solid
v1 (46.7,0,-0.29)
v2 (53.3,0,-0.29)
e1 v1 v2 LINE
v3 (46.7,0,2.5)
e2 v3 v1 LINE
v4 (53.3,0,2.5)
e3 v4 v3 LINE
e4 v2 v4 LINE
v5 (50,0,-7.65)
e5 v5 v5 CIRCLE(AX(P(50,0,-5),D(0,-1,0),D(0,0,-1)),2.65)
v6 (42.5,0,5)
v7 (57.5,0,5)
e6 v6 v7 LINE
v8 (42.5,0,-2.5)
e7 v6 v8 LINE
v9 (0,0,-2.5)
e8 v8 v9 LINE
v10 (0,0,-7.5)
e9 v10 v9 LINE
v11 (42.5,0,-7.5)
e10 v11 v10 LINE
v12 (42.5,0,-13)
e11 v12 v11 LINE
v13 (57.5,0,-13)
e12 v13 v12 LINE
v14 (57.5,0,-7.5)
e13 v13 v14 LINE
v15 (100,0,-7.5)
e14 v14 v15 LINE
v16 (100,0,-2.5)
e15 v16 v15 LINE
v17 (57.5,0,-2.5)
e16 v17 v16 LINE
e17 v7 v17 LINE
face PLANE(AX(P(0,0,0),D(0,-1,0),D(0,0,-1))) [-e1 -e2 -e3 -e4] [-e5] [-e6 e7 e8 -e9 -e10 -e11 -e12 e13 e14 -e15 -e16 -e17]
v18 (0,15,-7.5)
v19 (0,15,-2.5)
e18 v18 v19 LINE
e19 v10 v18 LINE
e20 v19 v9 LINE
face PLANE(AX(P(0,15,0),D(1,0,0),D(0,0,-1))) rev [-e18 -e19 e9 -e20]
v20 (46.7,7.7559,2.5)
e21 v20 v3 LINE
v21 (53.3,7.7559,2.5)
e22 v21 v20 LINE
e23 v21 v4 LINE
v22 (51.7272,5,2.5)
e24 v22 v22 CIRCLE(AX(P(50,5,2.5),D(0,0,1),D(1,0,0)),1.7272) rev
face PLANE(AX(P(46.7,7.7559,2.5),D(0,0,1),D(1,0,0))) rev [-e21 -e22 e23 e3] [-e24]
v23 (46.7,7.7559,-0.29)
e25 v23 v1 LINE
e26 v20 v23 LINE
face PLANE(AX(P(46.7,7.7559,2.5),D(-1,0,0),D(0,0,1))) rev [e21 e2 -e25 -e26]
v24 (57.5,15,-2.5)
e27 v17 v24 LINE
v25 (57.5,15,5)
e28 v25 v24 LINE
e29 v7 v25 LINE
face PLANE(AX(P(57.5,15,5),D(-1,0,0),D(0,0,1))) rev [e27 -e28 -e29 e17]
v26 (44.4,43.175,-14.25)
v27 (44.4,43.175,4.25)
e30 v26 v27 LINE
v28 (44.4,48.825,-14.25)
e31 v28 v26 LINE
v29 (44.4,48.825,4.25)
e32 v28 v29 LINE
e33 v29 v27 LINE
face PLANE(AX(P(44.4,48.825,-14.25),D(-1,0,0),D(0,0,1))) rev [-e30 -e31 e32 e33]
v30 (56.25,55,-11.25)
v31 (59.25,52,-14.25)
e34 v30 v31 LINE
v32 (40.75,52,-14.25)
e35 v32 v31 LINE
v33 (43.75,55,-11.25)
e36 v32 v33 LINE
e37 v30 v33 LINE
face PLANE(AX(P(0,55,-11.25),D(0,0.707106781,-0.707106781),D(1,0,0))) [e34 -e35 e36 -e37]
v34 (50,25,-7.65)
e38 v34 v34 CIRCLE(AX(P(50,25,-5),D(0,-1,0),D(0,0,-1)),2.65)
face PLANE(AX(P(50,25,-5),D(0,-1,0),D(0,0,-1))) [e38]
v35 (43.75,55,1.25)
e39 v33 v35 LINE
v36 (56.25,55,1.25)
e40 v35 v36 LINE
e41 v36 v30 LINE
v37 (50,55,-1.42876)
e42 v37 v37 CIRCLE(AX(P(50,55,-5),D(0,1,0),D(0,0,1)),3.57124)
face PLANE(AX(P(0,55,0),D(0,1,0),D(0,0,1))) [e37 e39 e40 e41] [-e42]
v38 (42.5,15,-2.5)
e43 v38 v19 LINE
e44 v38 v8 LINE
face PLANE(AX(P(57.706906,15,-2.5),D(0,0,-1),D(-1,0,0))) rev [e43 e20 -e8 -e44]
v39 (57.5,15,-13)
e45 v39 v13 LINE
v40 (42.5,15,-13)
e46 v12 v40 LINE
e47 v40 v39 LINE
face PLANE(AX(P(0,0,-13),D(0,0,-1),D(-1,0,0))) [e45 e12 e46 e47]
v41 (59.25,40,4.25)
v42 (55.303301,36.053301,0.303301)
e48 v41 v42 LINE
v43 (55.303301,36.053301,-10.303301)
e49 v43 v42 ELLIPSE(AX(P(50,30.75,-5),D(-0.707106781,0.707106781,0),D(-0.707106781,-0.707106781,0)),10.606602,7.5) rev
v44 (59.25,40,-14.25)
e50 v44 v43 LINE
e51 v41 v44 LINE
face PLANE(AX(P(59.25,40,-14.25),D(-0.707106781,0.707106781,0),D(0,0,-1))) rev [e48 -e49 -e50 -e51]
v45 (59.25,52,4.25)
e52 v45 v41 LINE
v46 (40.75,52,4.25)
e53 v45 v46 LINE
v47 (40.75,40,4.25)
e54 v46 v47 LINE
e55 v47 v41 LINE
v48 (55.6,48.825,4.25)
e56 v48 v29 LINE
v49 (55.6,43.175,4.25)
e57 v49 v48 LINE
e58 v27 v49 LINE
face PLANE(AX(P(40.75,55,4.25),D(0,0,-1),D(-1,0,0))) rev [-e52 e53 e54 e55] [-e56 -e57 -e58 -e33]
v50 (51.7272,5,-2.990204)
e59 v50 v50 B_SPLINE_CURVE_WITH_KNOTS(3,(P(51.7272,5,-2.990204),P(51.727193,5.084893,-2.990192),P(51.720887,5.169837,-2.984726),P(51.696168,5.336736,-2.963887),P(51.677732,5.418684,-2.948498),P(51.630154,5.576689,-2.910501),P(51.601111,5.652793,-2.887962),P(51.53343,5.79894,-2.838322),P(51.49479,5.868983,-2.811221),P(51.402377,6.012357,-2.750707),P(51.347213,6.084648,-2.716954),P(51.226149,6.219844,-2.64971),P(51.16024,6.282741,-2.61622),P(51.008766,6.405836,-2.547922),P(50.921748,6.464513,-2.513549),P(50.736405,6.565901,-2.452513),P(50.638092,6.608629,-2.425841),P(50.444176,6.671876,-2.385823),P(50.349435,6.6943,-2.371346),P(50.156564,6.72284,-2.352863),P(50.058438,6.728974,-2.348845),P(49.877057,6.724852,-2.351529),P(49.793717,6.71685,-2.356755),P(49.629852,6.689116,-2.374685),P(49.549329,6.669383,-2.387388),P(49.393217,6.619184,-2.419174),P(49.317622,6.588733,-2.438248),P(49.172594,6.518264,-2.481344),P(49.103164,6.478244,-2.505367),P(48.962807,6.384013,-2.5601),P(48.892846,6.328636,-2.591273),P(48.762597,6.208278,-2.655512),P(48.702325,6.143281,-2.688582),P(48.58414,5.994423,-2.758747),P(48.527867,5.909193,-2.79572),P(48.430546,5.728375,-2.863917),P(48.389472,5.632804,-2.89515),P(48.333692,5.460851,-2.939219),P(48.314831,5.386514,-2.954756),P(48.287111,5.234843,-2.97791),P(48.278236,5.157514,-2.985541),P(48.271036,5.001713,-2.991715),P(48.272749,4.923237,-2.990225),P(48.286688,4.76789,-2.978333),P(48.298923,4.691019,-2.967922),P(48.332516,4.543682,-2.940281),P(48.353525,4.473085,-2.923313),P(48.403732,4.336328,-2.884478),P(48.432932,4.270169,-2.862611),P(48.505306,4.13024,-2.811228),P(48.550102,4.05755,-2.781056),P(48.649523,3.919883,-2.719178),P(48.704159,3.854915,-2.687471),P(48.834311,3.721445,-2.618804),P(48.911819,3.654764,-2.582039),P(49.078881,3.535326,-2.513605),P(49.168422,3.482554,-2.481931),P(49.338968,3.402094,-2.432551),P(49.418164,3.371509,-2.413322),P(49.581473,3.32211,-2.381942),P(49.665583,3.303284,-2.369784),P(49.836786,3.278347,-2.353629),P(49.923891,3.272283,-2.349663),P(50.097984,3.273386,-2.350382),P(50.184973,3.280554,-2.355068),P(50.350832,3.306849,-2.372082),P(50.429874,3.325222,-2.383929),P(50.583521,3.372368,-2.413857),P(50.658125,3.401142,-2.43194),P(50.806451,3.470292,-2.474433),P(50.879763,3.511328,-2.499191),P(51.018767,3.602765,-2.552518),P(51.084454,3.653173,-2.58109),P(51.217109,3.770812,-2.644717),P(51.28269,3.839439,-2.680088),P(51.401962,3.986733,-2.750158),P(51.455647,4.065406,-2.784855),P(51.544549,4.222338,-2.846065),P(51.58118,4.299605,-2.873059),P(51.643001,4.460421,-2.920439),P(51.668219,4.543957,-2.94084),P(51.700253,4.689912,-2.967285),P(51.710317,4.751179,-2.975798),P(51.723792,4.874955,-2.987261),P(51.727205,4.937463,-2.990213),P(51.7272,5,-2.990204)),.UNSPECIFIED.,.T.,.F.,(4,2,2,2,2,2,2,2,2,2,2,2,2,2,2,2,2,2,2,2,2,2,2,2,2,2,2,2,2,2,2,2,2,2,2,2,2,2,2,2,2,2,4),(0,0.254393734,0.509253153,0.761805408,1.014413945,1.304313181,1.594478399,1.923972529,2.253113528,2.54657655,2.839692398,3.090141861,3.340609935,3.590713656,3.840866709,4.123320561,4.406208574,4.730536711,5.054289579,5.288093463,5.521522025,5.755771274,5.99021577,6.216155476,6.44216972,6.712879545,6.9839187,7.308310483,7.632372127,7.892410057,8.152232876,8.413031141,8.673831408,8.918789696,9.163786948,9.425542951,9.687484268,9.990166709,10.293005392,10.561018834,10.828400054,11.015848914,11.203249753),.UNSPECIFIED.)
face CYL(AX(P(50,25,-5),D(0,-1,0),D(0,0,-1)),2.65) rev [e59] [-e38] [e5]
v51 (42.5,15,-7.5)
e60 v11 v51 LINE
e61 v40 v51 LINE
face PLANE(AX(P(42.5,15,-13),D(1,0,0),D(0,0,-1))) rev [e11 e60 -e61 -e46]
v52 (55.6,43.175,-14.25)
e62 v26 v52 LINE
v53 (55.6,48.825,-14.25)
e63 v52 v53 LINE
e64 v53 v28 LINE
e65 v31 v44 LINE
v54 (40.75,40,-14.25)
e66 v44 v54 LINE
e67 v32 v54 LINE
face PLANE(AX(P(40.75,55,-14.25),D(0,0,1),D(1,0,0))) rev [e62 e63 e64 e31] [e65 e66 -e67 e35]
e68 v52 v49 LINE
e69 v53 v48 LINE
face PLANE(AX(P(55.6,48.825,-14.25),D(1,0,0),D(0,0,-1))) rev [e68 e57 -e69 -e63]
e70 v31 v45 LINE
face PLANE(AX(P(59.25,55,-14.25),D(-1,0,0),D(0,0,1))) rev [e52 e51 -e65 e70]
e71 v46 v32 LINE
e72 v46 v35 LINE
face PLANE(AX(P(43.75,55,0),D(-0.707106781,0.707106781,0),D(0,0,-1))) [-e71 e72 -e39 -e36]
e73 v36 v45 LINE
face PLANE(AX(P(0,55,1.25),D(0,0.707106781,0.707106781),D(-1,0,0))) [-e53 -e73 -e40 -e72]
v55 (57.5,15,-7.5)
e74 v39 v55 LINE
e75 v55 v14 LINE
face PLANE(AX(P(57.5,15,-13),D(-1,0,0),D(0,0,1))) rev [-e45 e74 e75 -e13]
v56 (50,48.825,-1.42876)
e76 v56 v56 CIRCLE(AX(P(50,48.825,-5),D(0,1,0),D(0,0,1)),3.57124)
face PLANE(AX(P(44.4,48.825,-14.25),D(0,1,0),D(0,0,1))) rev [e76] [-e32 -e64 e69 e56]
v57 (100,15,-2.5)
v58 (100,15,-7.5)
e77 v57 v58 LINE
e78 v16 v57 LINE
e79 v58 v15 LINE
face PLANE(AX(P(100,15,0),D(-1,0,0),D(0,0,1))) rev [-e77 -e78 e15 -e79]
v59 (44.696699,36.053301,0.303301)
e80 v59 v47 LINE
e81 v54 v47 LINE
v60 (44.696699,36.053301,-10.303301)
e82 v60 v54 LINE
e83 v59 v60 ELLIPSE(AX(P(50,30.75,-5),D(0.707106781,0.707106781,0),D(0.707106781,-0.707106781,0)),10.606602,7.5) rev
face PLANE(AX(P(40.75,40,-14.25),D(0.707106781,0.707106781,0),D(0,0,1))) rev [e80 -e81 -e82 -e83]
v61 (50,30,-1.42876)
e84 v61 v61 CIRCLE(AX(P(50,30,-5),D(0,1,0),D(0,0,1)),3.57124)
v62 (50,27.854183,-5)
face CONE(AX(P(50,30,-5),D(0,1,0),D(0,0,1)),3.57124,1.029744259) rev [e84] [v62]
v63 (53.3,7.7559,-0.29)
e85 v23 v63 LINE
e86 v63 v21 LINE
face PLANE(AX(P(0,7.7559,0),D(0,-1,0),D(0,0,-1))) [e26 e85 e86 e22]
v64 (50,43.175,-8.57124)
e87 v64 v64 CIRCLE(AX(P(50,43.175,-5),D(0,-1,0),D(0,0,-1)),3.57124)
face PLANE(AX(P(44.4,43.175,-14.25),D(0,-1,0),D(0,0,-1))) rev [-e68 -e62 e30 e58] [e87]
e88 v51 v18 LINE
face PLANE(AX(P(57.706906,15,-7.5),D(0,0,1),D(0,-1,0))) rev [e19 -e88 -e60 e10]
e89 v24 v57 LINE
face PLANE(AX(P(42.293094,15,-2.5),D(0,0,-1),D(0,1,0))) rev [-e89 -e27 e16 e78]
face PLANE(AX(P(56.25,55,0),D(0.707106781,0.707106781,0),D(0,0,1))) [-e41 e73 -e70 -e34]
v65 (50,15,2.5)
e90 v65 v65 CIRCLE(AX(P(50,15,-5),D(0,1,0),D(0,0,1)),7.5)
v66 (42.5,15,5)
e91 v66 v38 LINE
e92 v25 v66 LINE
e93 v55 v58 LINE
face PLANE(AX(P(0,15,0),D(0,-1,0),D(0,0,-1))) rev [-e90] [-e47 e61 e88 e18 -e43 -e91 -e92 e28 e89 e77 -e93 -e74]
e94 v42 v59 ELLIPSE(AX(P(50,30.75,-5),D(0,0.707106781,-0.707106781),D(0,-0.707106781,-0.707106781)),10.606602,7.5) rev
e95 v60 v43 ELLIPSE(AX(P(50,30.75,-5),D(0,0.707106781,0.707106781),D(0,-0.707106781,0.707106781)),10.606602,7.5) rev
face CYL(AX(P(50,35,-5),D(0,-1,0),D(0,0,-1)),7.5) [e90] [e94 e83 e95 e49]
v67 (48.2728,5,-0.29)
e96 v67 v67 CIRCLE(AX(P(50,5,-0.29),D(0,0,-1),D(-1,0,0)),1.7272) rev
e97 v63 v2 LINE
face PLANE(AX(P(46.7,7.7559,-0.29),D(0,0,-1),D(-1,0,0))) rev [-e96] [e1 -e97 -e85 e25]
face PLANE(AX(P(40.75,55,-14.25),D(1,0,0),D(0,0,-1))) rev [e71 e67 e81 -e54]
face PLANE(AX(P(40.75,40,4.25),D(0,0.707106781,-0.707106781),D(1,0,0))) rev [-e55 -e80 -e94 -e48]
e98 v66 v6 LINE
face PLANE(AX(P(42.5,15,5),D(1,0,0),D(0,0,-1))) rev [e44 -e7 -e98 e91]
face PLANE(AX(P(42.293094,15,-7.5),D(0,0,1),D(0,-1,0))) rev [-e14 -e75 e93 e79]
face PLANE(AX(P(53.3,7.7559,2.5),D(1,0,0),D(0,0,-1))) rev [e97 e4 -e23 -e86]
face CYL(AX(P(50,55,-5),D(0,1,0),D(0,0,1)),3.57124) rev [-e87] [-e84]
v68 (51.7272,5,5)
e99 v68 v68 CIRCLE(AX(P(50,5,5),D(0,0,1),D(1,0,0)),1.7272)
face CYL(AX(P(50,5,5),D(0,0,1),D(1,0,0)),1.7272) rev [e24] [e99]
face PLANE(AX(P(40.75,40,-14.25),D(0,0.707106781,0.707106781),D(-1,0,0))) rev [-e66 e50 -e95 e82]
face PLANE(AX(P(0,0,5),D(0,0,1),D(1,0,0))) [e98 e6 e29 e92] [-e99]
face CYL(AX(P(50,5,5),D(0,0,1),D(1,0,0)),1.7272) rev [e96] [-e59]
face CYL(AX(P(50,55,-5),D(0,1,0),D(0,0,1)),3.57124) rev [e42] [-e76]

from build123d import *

# Parameters (mm, degrees)
SKETCH1_W                   = 100
SKETCH1_H                   = 10
BOSS_EXTRUDE1_DEPTH         = 15
SKETCH2_R                   = 7.5
BOSS_EXTRUDE2_DEPTH         = 20
SKETCH3_W                   = 18.5
SKETCH3_H                   = 18.5
BOSS_EXTRUDE3_DEPTH         = 20
CHAMFER1_SIZE               = 3
CHAMFER2_SIZE               = 5
SKETCH4_W                   = 11.2
SKETCH4_H                   = 5.65
CUT_EXTRUDE1_DEPTH          = 116.616824035
F_1_4_CLEARANCE_HOLE1_D     = 7.14248
F_1_4_CLEARANCE_HOLE1_DEPTH = 25
F_1_4_CLEARANCE_HOLE1_TIP   = 2.145817477
SKETCH8_W                   = 15
SKETCH8_H                   = 15
BOSS_EXTRUDE4_DEPTH         = 5
SKETCH9_R                   = 2.65
CUT_EXTRUDE2_DEPTH          = 25
F_4_CLEARANCE_HOLE1_D       = 3.4544
F_4_CLEARANCE_HOLE1_DEPTH   = 10
F_4_CLEARANCE_HOLE1_TIP     = 1.037806461
SKETCH13_W                  = 6.6
SKETCH13_H                  = 2.79
CUT_EXTRUDE3_DEPTH          = 7.7559
SKETCH14_W                  = 15
SKETCH14_H                  = 15
BOSS_EXTRUDE5_DEPTH         = 3
SKETCH15_W                  = 2.5
SKETCH15_H                  = 15
CUT_EXTRUDE4_DEPTH          = 42.5
SKETCH16_W                  = 2.5
SKETCH16_H                  = 15
CUT_EXTRUDE5_DEPTH          = 42.5


with BuildPart() as part:
    # Sketch1 → Boss-Extrude1 (new body)
    with BuildSketch(Plane(origin=(0, 0, 0), x_dir=(1, 0, 0), z_dir=(0, 1, 0))):
        with Locations((50, 5)):
            Rectangle(SKETCH1_W, SKETCH1_H)
    extrude(amount=BOSS_EXTRUDE1_DEPTH)

    # Sketch2 → Boss-Extrude2 (add)
    with BuildSketch(Plane(origin=(0, 15, 0), x_dir=(1, 0, 0), z_dir=(0, 1, 0))):
        with Locations(Location((50, 5, 0), (0, 0, 41.810314896))):
            Circle(SKETCH2_R)
    extrude(amount=BOSS_EXTRUDE2_DEPTH)

    # Sketch3 → Boss-Extrude3 (add)
    with BuildSketch(Plane(origin=(0, 35, 0), x_dir=(1, 0, 0), z_dir=(0, 1, 0))):
        with Locations((50, 5)):
            Rectangle(SKETCH3_W, SKETCH3_H)
    extrude(amount=BOSS_EXTRUDE3_DEPTH)

    # Chamfer1
    chamfer1_edges = [part.edges().sort_by_distance(p)[0] for p in [
        (40.75, 55, -5),
        (50, 55, 4.25),
        (59.25, 55, -5),
        (50, 55, -14.25),
    ]]
    chamfer(chamfer1_edges, length=CHAMFER1_SIZE)

    # Chamfer2
    # the kernel refuses this chamfer: 5 mm, written as the material it takes off along each edge
    with BuildSketch(Plane(origin=(27.89158506, 35, -14.25), x_dir=(0, 0.9996219169112968, -0.027495876610586317), z_dir=(1, 0, 0))) as chamfer2_piece_1_section:
        Polygon((CHAMFER2_SIZE * 0.999621916911, CHAMFER2_SIZE * 0.0274958766106), (-CHAMFER2_SIZE * 0.0274958766106, CHAMFER2_SIZE * 0.999621916911), (0, 0), align=None)
    chamfer2_piece_1 = extrude(amount=44.21682988, mode=Mode.PRIVATE)
    chamfer2_piece_1 = chamfer2_piece_1 - Plane(origin=(50, 36.70985324, -5), x_dir=(0.7453559924973537, 0, -0.6666666666695469), z_dir=(0, -1, 0)) * Cylinder(7.5, 109, mode=Mode.PRIVATE)
    with BuildSketch(Plane(origin=(40.75, 35, 17.10841494), x_dir=(-0.027495876610586317, 0.9996219169112968, 0), z_dir=(0, 0, -1))) as chamfer2_piece_2_section:
        Polygon((CHAMFER2_SIZE * 0.999621916911, CHAMFER2_SIZE * 0.0274958766106), (-CHAMFER2_SIZE * 0.0274958766106, CHAMFER2_SIZE * 0.999621916911), (0, 0), align=None)
    chamfer2_piece_2 = extrude(amount=44.21682988, mode=Mode.PRIVATE)
    chamfer2_piece_2 = chamfer2_piece_2 - Plane(origin=(50, 36.709853278, -5), x_dir=(0.7453559924973537, 0, -0.6666666666695469), z_dir=(0, -1, 0)) * Cylinder(7.5, 109, mode=Mode.PRIVATE)
    with BuildSketch(Plane(origin=(59.25, 35, -27.10841494), x_dir=(-0.9996219169112968, -0.027495876610586317, 0), z_dir=(0, 0, 1))) as chamfer2_piece_3_section:
        Polygon((CHAMFER2_SIZE * 0.999621916911, -CHAMFER2_SIZE * 0.0274958766106), (-CHAMFER2_SIZE * 0.0274958766106, -CHAMFER2_SIZE * 0.999621916911), (0, 0), align=None)
    chamfer2_piece_3 = extrude(amount=44.21682988, mode=Mode.PRIVATE)
    chamfer2_piece_3 = chamfer2_piece_3 - Plane(origin=(50, 36.709853248, -5), x_dir=(0.7453559924973537, 0, -0.6666666666695469), z_dir=(0, -1, 0)) * Cylinder(7.5, 109, mode=Mode.PRIVATE)
    with BuildSketch(Plane(origin=(72.10841494, 35, 4.25), x_dir=(0, -0.027495876610586317, -0.9996219169112968), z_dir=(-1, 0, 0))) as chamfer2_piece_4_section:
        Polygon((CHAMFER2_SIZE * 0.999621916911, -CHAMFER2_SIZE * 0.0274958766106), (-CHAMFER2_SIZE * 0.0274958766106, -CHAMFER2_SIZE * 0.999621916911), (0, 0), align=None)
    chamfer2_piece_4 = extrude(amount=44.21682988, mode=Mode.PRIVATE)
    chamfer2_piece_4 = chamfer2_piece_4 - Plane(origin=(50, 36.709853226, -5), x_dir=(0.7453559924973537, 0, -0.6666666666695469), z_dir=(0, -1, 0)) * Cylinder(7.5, 109, mode=Mode.PRIVATE)
    add([chamfer2_piece_1, chamfer2_piece_2, chamfer2_piece_3, chamfer2_piece_4], mode=Mode.SUBTRACT)

    # Sketch4 → Cut-Extrude1 (cut, through all)
    with BuildSketch(Plane.XY.offset(4.25)):
        with Locations((50, 46)):
            Rectangle(SKETCH4_W, SKETCH4_H)
    extrude(amount=-CUT_EXTRUDE1_DEPTH, mode=Mode.SUBTRACT)

    # 1/4 Clearance Hole1
    with Locations(Plane(origin=(0, 55, 0), x_dir=(1, 0, 0), z_dir=(0, 1, 0))):
        with Locations((50, 5)):
            Hole(F_1_4_CLEARANCE_HOLE1_D / 2, depth=F_1_4_CLEARANCE_HOLE1_DEPTH)
            with Locations((0, 0, -(F_1_4_CLEARANCE_HOLE1_DEPTH + F_1_4_CLEARANCE_HOLE1_TIP / 2))):  # 118° drill point
                Cone(0, F_1_4_CLEARANCE_HOLE1_D / 2, F_1_4_CLEARANCE_HOLE1_TIP, mode=Mode.SUBTRACT)

    # Sketch8 → Boss-Extrude4 (add)
    with BuildSketch(Plane.XY):
        with Locations((50, 7.5)):
            Rectangle(SKETCH8_W, SKETCH8_H)
    extrude(amount=BOSS_EXTRUDE4_DEPTH)

    # Sketch9 → Cut-Extrude2 (cut)
    with BuildSketch(Plane.XZ):
        with Locations(Location((50, -5, 0), (0, 0, 270))):
            Circle(SKETCH9_R)
    extrude(amount=-CUT_EXTRUDE2_DEPTH, mode=Mode.SUBTRACT)

    # #4 Clearance Hole1
    with Locations(Plane.XY.offset(5)):
        with Locations((50, 5)):
            Hole(F_4_CLEARANCE_HOLE1_D / 2, depth=F_4_CLEARANCE_HOLE1_DEPTH)
            with Locations((0, 0, -(F_4_CLEARANCE_HOLE1_DEPTH + F_4_CLEARANCE_HOLE1_TIP / 2))):  # 118° drill point
                Cone(0, F_4_CLEARANCE_HOLE1_D / 2, F_4_CLEARANCE_HOLE1_TIP, mode=Mode.SUBTRACT)

    # Sketch13 → Cut-Extrude3 (cut)
    with BuildSketch(Plane.XZ):
        with Locations((50, 1.105)):
            Rectangle(SKETCH13_W, SKETCH13_H)
    extrude(amount=-CUT_EXTRUDE3_DEPTH, mode=Mode.SUBTRACT)

    # Sketch14 → Boss-Extrude5 (add)
    with BuildSketch(Plane(origin=(0, 0, -10), x_dir=(-1, 0, 0), z_dir=(0, 0, -1))):
        with Locations((-50, 7.5)):
            Rectangle(SKETCH14_W, SKETCH14_H)
    extrude(amount=BOSS_EXTRUDE5_DEPTH)

    # Sketch15 → Cut-Extrude4 (cut)
    with BuildSketch(Plane(origin=(100, 0, 0), x_dir=(0, 0, -1), z_dir=(1, 0, 0))):
        with Locations((1.25, 7.5)):
            Rectangle(SKETCH15_W, SKETCH15_H)
        with Locations((8.75, 7.5)):
            Rectangle(SKETCH15_W, SKETCH15_H)
    extrude(amount=-CUT_EXTRUDE4_DEPTH, mode=Mode.SUBTRACT)

    # Sketch16 → Cut-Extrude5 (cut)
    with BuildSketch(Plane.ZY):
        with Locations((-8.75, 7.5)):
            Rectangle(SKETCH16_W, SKETCH16_H)
        with Locations((-1.25, 7.5)):
            Rectangle(SKETCH16_W, SKETCH16_H)
    extrude(amount=-CUT_EXTRUDE5_DEPTH, mode=Mode.SUBTRACT)


solid = part.part
